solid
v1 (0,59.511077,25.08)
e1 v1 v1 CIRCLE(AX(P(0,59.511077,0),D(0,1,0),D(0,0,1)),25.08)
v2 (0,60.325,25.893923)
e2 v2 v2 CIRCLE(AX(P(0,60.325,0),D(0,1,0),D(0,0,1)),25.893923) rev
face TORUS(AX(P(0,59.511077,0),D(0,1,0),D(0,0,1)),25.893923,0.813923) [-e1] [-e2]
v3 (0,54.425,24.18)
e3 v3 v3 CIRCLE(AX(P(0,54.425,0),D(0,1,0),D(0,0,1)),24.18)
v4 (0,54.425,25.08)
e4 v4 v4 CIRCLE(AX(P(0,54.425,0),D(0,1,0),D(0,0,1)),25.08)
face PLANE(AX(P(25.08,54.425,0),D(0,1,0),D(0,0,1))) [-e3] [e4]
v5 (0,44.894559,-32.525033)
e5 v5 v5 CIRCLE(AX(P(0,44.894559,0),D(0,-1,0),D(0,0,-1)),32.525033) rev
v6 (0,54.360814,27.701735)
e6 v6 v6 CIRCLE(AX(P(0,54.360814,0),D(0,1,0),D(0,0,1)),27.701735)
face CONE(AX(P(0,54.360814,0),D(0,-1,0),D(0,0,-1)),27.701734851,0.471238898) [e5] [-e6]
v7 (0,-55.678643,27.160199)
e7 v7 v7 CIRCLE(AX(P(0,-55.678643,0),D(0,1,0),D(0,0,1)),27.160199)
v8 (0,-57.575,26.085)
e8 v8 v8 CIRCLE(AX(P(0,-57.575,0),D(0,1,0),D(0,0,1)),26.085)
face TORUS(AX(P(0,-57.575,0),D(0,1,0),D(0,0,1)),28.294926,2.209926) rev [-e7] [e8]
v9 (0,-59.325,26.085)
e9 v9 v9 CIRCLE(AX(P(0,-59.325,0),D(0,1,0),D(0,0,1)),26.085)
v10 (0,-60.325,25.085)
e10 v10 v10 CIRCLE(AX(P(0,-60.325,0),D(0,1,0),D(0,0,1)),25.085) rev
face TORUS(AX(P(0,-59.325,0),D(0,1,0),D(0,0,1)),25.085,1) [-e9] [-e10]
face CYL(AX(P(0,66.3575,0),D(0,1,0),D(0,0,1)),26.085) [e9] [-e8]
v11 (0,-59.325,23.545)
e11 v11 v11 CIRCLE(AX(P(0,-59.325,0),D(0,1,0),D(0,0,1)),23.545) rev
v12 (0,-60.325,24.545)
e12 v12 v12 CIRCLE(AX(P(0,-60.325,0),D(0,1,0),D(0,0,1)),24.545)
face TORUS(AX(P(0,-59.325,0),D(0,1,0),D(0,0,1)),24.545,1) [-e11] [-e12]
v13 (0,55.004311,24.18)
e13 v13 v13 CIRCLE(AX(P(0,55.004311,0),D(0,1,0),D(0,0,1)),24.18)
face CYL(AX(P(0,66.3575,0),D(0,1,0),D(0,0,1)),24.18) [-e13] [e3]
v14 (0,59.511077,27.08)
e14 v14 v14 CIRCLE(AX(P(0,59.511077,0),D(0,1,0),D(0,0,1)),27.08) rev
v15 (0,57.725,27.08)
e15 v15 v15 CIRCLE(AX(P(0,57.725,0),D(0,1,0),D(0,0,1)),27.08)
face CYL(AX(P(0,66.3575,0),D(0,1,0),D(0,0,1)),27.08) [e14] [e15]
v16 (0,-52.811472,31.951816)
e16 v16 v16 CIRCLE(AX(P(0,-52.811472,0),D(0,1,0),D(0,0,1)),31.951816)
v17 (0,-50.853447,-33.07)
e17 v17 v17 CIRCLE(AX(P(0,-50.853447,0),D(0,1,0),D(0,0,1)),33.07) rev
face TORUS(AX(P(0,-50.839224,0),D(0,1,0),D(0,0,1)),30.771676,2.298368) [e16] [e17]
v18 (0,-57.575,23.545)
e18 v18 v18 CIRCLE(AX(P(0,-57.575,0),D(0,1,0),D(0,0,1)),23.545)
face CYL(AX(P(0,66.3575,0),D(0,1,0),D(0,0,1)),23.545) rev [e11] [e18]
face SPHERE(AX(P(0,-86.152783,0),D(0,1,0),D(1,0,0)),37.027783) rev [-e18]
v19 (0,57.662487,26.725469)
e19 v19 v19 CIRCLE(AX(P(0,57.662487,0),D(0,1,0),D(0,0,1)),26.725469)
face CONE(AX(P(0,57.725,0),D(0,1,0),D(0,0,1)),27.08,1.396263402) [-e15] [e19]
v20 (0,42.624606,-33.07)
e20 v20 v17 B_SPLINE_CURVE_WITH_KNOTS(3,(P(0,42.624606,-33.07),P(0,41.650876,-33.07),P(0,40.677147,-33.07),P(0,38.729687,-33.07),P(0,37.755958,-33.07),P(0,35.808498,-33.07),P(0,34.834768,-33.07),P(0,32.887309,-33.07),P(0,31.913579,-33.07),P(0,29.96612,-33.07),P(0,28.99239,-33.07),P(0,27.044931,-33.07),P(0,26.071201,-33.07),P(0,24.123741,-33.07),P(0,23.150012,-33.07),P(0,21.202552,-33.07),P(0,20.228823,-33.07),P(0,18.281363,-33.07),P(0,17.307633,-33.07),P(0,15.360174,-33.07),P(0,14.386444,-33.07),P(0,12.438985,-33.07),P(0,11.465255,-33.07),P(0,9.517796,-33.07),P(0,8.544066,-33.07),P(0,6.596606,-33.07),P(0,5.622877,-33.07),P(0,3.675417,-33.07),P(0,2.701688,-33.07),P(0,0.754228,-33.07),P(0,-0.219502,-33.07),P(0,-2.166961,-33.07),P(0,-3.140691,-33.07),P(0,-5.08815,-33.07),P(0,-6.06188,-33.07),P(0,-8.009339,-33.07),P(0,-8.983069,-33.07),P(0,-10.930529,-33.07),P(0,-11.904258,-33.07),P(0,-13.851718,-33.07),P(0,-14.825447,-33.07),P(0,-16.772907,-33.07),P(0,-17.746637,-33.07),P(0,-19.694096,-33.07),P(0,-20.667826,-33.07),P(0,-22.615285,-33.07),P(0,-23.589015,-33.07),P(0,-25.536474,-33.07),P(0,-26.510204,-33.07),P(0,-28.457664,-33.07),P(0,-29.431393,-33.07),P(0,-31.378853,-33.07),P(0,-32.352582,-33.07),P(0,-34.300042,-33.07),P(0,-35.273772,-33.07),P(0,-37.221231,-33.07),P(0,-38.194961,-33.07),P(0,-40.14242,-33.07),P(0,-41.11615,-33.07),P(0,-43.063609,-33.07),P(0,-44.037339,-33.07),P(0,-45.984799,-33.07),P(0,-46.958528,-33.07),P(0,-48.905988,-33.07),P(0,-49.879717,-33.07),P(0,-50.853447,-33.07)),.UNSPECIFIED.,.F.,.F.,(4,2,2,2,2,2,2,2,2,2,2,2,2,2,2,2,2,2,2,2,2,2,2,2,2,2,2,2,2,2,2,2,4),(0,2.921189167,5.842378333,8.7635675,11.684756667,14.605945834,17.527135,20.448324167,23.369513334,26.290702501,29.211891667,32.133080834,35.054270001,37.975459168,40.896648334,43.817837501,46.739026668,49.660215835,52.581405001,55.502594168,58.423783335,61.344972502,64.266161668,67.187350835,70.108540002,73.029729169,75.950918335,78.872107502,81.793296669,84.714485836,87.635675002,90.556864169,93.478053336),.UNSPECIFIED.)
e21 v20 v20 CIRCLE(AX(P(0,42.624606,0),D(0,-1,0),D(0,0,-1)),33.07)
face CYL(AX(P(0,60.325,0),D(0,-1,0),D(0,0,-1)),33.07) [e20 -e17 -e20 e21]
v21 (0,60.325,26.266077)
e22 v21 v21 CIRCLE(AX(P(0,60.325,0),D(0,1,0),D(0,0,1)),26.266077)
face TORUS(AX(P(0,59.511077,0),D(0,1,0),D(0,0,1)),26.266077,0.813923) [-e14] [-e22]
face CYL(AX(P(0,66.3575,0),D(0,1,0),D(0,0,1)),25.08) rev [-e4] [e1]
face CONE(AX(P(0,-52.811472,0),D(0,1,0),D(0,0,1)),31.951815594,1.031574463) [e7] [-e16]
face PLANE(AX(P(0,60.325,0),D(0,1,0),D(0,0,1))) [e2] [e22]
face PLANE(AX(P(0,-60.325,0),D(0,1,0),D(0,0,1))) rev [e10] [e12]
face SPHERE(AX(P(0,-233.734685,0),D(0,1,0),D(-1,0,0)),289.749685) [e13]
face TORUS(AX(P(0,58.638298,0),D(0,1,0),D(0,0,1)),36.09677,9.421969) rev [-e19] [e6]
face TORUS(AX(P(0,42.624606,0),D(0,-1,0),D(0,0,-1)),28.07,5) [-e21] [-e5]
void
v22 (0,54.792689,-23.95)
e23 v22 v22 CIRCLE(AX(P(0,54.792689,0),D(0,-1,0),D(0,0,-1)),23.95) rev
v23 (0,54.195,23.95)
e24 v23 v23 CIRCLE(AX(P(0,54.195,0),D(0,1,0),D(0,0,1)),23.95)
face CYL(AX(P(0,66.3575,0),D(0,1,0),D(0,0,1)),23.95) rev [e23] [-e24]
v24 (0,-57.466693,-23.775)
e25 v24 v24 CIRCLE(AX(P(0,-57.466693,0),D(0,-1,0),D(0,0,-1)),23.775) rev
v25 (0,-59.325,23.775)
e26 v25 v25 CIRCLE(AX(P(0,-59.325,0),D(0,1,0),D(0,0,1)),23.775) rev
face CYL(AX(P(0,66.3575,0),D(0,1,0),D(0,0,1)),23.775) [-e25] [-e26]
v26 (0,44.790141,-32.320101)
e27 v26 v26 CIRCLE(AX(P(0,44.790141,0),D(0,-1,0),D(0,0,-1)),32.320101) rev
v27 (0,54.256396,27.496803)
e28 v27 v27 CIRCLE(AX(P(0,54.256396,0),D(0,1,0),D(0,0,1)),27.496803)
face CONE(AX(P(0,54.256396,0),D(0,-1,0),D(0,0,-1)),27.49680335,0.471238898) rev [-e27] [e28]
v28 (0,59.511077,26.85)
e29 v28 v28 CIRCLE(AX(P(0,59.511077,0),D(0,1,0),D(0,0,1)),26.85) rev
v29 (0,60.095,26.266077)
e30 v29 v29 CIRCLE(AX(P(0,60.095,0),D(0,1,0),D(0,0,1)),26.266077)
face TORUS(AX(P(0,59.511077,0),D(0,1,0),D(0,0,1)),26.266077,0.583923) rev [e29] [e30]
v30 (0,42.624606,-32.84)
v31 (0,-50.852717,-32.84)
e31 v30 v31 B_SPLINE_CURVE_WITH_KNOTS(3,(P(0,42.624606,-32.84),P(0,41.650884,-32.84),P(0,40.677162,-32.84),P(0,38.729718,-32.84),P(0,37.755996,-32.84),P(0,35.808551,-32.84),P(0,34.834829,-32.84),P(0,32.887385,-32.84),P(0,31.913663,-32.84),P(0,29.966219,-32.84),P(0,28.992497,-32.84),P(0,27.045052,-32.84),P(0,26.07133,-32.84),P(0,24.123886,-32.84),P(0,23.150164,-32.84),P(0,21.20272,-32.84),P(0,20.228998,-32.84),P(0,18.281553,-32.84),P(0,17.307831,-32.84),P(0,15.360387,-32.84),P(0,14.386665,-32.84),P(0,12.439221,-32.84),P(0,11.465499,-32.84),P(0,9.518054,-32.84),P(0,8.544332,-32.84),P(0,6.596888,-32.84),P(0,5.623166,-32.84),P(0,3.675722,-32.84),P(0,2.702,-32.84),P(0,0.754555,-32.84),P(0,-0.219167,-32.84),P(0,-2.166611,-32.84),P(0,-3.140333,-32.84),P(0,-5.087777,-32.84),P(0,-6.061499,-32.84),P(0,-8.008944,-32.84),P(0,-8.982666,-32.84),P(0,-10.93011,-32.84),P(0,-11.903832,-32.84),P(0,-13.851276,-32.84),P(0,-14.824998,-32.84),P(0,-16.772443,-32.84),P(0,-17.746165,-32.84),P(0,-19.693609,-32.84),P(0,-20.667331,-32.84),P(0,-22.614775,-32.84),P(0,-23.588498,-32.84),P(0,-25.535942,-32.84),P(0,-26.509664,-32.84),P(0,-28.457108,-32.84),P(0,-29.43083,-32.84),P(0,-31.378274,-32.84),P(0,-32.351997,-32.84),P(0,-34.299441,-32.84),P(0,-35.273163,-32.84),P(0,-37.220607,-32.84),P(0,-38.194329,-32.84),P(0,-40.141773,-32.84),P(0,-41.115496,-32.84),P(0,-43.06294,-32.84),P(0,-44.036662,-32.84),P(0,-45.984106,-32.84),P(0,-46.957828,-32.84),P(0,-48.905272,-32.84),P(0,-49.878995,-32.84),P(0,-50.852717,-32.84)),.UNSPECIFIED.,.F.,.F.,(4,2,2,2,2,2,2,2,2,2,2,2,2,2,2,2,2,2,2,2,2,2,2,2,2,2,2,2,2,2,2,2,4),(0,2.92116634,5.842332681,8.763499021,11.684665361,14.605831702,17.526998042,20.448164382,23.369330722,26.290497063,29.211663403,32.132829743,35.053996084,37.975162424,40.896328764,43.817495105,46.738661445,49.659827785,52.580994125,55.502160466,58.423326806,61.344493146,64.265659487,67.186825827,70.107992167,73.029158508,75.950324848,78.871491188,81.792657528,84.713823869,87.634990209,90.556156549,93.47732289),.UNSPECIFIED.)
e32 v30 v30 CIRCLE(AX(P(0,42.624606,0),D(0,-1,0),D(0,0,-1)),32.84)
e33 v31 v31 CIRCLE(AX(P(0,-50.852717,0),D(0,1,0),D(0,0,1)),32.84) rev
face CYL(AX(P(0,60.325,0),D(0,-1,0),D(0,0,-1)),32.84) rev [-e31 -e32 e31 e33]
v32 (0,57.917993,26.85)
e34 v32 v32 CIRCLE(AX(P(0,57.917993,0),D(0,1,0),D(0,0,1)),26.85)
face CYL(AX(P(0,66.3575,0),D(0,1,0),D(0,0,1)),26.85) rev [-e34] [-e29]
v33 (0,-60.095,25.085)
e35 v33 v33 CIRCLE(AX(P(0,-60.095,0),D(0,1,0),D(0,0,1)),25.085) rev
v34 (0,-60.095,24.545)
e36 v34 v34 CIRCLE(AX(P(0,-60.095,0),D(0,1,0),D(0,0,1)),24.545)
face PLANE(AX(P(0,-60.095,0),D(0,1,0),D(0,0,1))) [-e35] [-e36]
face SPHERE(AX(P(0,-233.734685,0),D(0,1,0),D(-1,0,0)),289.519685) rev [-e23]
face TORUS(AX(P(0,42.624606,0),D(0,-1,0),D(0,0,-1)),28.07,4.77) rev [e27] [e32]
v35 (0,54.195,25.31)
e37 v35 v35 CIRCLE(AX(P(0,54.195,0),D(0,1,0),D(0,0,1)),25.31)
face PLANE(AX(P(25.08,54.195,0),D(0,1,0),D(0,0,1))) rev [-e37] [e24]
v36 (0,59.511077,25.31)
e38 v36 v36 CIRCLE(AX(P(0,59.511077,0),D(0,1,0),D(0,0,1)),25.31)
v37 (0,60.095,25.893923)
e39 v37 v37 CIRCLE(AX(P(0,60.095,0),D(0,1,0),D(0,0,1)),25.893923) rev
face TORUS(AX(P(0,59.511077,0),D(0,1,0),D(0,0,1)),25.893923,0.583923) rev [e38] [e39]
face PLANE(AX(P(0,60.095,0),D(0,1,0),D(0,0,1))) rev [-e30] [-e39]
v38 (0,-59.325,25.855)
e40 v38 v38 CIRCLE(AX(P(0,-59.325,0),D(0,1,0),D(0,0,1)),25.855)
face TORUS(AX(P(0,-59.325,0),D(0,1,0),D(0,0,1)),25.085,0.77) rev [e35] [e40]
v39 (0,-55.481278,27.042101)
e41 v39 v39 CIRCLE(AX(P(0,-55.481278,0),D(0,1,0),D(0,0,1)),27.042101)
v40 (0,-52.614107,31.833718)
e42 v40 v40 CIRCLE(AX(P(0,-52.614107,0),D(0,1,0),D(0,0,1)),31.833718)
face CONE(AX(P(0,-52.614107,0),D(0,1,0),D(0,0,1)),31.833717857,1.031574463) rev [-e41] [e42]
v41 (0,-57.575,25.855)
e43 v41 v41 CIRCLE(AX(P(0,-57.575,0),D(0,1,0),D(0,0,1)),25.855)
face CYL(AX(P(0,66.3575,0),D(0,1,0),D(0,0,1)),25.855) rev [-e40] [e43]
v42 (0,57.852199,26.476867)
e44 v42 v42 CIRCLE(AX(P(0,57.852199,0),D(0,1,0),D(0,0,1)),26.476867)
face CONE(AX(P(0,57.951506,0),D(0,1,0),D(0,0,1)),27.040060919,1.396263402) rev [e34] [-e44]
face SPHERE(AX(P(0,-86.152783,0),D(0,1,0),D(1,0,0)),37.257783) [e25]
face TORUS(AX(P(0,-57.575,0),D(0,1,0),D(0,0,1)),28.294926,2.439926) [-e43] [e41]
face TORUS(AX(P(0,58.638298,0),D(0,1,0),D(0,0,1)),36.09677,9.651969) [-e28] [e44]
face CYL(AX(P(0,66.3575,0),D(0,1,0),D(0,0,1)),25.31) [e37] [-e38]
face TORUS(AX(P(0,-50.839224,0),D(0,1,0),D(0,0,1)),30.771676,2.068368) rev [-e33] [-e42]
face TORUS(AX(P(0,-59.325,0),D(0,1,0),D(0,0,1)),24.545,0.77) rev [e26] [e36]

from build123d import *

# Parameters (mm, degrees)
SKETCH2_R      = 33.07
EXTRUDE1_DEPTH = 60.325
FILLET1_R      = 5
FILLET2_R      = 0.813923365
FILLET3_R      = 1


# Read off the part's stored shape, not the designer's step: Shell12
with BuildPart() as part:
    # Sketch2 → Extrude1 (new, symmetric)
    with BuildSketch(Plane(origin=(0, 0, 0), x_dir=(1, 0, 0), z_dir=(0, 1, 0))):
        with Locations(Location((0, 0, 0), (0, 0, 90))):
            Circle(SKETCH2_R)
    extrude(amount=EXTRUDE1_DEPTH, both=True)

    # Sketch3 → Cut-Revolve1 (revolve, cut)
    with BuildSketch(Plane.XY, mode=Mode.PRIVATE) as cut_revolve1_sk:
        with BuildLine():
            Line((33.07, 43.825), (27.701734851, 54.360813578))
            ThreePointArc((27.701734851, 54.360813578), (27.061509387, 55.966678123), (26.725469209, 57.662486656))
            Line((26.725469209, 57.662486656), (27.08, 57.725))
            Line((27.08, 57.725), (27.08, 60.325))
            Line((27.08, 60.325), (33.07, 60.325))
            Line((33.07, 60.325), (33.07, 43.825))
        make_face()
        with BuildLine():
            Line((24.18, 55.00431056), (24.18, 54.425))
            Line((24.18, 54.425), (25.08, 54.425))
            Line((25.08, 54.425), (25.08, 60.325))
            Line((25.08, 60.325), (0, 60.325))
            Line((0, 60.325), (0, 56.015))
            ThreePointArc((0, 56.015), (12.100556735, 55.762217374), (24.18, 55.00431056))
        make_face()
    revolve(cut_revolve1_sk.sketch.rotate(Axis((0, 66.3575, 0), (0, -1, 0)), 90), axis=Axis((0, 66.3575, 0), (0, -1, 0)), mode=Mode.SUBTRACT)

    # Fillet1
    fillet1_edges = [part.edges().sort_by_distance(p)[0] for p in [
        (-33.07, 43.825, 0),
    ]]
    fillet(fillet1_edges, radius=FILLET1_R)

    # Fillet2
    fillet2_edges = [part.edges().sort_by_distance(p)[0] for p in [
        (0, 60.325, -25.08),
        (0, 60.325, -27.08),
    ]]
    fillet(fillet2_edges, radius=FILLET2_R)

    # Sketch4 → Cut-Revolve2 (revolve, cut)
    with BuildSketch(Plane.XY, mode=Mode.PRIVATE) as cut_revolve2_sk:
        with BuildLine():
            Line((0, -49.125), (0, -60.325))
            Line((0, -60.325), (23.545, -60.325))
            Line((23.545, -60.325), (23.545, -57.575))
            ThreePointArc((23.545, -57.575), (12.507692883, -51.301465512), (0, -49.125))
        make_face()
        with BuildLine():
            Line((33.5, -60.325), (33.5, -50.825))
            Line((33.5, -50.825), (33.07, -50.825))
            ThreePointArc((33.07, -50.825), (32.774535338, -51.966631989), (31.951815594, -52.811472321))
            Line((31.951815594, -52.811472321), (27.160198994, -55.678643368))
            ThreePointArc((27.160198994, -55.678643368), (26.372501012, -56.485020487), (26.085, -57.575))
            Line((26.085, -57.575), (26.085, -60.325))
            Line((26.085, -60.325), (33.5, -60.325))
        make_face()
    revolve(cut_revolve2_sk.sketch.rotate(Axis((0, 66.3575, 0), (0, -1, 0)), 90), axis=Axis((0, 66.3575, 0), (0, -1, 0)), mode=Mode.SUBTRACT)

    # Fillet3
    fillet3_edges = [part.edges().sort_by_distance(p)[0] for p in [
        (0, -60.325, -23.545),
        (0, -60.325, -26.085),
    ]]
    fillet(fillet3_edges, radius=FILLET3_R)

    # Shell12 outline → Shell12 (revolve, cut)
    with BuildSketch(Plane.XY):
        with BuildLine():
            ThreePointArc((32.84, 42.624606205), (32.70820452, 43.73814059), (32.32010112, 44.790140888))
            Line((32.32010112, 44.790140888), (27.49680335, 54.256395763))
            ThreePointArc((27.49680335, 54.256395763), (26.81111619, 56.004455596), (26.476866639, 57.852199436))
            Line((26.476866639, 57.852199436), (26.85, 57.917992915))
            Line((26.85, 57.917992915), (26.85, 59.511076635))
            ThreePointArc((26.85, 59.511076635), (26.678972806, 59.923972806), (26.266076635, 60.095))
            Line((26.266076635, 60.095), (25.893923365, 60.095))
            ThreePointArc((25.893923365, 60.095), (25.481027194, 59.923972806), (25.31, 59.511076635))
            Line((25.31, 59.511076635), (25.31, 54.195))
            Line((25.31, 54.195), (23.95, 54.195))
            Line((23.95, 54.195), (23.950000096, 54.792688913))
            ThreePointArc((23.950000096, 54.792688913), (11.985274151, 55.536815853), (0, 55.785))
            Line((0, 55.785), (0, -48.895))
            ThreePointArc((0, -48.895), (12.636500179, -51.103371375), (23.775000029, -57.466692993))
            Line((23.775000029, -57.466692993), (23.775, -59.325))
            ThreePointArc((23.775, -59.325), (24.000527778, -59.869472222), (24.545, -60.095))
            Line((24.545, -60.095), (25.085, -60.095))
            ThreePointArc((25.085, -60.095), (25.629472222, -59.869472222), (25.855, -59.325))
            Line((25.855, -59.325), (25.855, -57.575))
            ThreePointArc((25.855, -57.575), (26.172422927, -56.371579929), (27.042101257, -55.481278415))
            Line((27.042101257, -55.481278415), (31.833717857, -52.614107368))
            ThreePointArc((31.833717857, -52.614107368), (32.56762201, -51.865246929), (32.84, -50.852716685))
            Line((32.84, -50.852716685), (32.84, 42.624606205))
        make_face()
    revolve(axis=Axis((0, 0, 0), (0, 1, 0)), mode=Mode.SUBTRACT)


solid = part.part
